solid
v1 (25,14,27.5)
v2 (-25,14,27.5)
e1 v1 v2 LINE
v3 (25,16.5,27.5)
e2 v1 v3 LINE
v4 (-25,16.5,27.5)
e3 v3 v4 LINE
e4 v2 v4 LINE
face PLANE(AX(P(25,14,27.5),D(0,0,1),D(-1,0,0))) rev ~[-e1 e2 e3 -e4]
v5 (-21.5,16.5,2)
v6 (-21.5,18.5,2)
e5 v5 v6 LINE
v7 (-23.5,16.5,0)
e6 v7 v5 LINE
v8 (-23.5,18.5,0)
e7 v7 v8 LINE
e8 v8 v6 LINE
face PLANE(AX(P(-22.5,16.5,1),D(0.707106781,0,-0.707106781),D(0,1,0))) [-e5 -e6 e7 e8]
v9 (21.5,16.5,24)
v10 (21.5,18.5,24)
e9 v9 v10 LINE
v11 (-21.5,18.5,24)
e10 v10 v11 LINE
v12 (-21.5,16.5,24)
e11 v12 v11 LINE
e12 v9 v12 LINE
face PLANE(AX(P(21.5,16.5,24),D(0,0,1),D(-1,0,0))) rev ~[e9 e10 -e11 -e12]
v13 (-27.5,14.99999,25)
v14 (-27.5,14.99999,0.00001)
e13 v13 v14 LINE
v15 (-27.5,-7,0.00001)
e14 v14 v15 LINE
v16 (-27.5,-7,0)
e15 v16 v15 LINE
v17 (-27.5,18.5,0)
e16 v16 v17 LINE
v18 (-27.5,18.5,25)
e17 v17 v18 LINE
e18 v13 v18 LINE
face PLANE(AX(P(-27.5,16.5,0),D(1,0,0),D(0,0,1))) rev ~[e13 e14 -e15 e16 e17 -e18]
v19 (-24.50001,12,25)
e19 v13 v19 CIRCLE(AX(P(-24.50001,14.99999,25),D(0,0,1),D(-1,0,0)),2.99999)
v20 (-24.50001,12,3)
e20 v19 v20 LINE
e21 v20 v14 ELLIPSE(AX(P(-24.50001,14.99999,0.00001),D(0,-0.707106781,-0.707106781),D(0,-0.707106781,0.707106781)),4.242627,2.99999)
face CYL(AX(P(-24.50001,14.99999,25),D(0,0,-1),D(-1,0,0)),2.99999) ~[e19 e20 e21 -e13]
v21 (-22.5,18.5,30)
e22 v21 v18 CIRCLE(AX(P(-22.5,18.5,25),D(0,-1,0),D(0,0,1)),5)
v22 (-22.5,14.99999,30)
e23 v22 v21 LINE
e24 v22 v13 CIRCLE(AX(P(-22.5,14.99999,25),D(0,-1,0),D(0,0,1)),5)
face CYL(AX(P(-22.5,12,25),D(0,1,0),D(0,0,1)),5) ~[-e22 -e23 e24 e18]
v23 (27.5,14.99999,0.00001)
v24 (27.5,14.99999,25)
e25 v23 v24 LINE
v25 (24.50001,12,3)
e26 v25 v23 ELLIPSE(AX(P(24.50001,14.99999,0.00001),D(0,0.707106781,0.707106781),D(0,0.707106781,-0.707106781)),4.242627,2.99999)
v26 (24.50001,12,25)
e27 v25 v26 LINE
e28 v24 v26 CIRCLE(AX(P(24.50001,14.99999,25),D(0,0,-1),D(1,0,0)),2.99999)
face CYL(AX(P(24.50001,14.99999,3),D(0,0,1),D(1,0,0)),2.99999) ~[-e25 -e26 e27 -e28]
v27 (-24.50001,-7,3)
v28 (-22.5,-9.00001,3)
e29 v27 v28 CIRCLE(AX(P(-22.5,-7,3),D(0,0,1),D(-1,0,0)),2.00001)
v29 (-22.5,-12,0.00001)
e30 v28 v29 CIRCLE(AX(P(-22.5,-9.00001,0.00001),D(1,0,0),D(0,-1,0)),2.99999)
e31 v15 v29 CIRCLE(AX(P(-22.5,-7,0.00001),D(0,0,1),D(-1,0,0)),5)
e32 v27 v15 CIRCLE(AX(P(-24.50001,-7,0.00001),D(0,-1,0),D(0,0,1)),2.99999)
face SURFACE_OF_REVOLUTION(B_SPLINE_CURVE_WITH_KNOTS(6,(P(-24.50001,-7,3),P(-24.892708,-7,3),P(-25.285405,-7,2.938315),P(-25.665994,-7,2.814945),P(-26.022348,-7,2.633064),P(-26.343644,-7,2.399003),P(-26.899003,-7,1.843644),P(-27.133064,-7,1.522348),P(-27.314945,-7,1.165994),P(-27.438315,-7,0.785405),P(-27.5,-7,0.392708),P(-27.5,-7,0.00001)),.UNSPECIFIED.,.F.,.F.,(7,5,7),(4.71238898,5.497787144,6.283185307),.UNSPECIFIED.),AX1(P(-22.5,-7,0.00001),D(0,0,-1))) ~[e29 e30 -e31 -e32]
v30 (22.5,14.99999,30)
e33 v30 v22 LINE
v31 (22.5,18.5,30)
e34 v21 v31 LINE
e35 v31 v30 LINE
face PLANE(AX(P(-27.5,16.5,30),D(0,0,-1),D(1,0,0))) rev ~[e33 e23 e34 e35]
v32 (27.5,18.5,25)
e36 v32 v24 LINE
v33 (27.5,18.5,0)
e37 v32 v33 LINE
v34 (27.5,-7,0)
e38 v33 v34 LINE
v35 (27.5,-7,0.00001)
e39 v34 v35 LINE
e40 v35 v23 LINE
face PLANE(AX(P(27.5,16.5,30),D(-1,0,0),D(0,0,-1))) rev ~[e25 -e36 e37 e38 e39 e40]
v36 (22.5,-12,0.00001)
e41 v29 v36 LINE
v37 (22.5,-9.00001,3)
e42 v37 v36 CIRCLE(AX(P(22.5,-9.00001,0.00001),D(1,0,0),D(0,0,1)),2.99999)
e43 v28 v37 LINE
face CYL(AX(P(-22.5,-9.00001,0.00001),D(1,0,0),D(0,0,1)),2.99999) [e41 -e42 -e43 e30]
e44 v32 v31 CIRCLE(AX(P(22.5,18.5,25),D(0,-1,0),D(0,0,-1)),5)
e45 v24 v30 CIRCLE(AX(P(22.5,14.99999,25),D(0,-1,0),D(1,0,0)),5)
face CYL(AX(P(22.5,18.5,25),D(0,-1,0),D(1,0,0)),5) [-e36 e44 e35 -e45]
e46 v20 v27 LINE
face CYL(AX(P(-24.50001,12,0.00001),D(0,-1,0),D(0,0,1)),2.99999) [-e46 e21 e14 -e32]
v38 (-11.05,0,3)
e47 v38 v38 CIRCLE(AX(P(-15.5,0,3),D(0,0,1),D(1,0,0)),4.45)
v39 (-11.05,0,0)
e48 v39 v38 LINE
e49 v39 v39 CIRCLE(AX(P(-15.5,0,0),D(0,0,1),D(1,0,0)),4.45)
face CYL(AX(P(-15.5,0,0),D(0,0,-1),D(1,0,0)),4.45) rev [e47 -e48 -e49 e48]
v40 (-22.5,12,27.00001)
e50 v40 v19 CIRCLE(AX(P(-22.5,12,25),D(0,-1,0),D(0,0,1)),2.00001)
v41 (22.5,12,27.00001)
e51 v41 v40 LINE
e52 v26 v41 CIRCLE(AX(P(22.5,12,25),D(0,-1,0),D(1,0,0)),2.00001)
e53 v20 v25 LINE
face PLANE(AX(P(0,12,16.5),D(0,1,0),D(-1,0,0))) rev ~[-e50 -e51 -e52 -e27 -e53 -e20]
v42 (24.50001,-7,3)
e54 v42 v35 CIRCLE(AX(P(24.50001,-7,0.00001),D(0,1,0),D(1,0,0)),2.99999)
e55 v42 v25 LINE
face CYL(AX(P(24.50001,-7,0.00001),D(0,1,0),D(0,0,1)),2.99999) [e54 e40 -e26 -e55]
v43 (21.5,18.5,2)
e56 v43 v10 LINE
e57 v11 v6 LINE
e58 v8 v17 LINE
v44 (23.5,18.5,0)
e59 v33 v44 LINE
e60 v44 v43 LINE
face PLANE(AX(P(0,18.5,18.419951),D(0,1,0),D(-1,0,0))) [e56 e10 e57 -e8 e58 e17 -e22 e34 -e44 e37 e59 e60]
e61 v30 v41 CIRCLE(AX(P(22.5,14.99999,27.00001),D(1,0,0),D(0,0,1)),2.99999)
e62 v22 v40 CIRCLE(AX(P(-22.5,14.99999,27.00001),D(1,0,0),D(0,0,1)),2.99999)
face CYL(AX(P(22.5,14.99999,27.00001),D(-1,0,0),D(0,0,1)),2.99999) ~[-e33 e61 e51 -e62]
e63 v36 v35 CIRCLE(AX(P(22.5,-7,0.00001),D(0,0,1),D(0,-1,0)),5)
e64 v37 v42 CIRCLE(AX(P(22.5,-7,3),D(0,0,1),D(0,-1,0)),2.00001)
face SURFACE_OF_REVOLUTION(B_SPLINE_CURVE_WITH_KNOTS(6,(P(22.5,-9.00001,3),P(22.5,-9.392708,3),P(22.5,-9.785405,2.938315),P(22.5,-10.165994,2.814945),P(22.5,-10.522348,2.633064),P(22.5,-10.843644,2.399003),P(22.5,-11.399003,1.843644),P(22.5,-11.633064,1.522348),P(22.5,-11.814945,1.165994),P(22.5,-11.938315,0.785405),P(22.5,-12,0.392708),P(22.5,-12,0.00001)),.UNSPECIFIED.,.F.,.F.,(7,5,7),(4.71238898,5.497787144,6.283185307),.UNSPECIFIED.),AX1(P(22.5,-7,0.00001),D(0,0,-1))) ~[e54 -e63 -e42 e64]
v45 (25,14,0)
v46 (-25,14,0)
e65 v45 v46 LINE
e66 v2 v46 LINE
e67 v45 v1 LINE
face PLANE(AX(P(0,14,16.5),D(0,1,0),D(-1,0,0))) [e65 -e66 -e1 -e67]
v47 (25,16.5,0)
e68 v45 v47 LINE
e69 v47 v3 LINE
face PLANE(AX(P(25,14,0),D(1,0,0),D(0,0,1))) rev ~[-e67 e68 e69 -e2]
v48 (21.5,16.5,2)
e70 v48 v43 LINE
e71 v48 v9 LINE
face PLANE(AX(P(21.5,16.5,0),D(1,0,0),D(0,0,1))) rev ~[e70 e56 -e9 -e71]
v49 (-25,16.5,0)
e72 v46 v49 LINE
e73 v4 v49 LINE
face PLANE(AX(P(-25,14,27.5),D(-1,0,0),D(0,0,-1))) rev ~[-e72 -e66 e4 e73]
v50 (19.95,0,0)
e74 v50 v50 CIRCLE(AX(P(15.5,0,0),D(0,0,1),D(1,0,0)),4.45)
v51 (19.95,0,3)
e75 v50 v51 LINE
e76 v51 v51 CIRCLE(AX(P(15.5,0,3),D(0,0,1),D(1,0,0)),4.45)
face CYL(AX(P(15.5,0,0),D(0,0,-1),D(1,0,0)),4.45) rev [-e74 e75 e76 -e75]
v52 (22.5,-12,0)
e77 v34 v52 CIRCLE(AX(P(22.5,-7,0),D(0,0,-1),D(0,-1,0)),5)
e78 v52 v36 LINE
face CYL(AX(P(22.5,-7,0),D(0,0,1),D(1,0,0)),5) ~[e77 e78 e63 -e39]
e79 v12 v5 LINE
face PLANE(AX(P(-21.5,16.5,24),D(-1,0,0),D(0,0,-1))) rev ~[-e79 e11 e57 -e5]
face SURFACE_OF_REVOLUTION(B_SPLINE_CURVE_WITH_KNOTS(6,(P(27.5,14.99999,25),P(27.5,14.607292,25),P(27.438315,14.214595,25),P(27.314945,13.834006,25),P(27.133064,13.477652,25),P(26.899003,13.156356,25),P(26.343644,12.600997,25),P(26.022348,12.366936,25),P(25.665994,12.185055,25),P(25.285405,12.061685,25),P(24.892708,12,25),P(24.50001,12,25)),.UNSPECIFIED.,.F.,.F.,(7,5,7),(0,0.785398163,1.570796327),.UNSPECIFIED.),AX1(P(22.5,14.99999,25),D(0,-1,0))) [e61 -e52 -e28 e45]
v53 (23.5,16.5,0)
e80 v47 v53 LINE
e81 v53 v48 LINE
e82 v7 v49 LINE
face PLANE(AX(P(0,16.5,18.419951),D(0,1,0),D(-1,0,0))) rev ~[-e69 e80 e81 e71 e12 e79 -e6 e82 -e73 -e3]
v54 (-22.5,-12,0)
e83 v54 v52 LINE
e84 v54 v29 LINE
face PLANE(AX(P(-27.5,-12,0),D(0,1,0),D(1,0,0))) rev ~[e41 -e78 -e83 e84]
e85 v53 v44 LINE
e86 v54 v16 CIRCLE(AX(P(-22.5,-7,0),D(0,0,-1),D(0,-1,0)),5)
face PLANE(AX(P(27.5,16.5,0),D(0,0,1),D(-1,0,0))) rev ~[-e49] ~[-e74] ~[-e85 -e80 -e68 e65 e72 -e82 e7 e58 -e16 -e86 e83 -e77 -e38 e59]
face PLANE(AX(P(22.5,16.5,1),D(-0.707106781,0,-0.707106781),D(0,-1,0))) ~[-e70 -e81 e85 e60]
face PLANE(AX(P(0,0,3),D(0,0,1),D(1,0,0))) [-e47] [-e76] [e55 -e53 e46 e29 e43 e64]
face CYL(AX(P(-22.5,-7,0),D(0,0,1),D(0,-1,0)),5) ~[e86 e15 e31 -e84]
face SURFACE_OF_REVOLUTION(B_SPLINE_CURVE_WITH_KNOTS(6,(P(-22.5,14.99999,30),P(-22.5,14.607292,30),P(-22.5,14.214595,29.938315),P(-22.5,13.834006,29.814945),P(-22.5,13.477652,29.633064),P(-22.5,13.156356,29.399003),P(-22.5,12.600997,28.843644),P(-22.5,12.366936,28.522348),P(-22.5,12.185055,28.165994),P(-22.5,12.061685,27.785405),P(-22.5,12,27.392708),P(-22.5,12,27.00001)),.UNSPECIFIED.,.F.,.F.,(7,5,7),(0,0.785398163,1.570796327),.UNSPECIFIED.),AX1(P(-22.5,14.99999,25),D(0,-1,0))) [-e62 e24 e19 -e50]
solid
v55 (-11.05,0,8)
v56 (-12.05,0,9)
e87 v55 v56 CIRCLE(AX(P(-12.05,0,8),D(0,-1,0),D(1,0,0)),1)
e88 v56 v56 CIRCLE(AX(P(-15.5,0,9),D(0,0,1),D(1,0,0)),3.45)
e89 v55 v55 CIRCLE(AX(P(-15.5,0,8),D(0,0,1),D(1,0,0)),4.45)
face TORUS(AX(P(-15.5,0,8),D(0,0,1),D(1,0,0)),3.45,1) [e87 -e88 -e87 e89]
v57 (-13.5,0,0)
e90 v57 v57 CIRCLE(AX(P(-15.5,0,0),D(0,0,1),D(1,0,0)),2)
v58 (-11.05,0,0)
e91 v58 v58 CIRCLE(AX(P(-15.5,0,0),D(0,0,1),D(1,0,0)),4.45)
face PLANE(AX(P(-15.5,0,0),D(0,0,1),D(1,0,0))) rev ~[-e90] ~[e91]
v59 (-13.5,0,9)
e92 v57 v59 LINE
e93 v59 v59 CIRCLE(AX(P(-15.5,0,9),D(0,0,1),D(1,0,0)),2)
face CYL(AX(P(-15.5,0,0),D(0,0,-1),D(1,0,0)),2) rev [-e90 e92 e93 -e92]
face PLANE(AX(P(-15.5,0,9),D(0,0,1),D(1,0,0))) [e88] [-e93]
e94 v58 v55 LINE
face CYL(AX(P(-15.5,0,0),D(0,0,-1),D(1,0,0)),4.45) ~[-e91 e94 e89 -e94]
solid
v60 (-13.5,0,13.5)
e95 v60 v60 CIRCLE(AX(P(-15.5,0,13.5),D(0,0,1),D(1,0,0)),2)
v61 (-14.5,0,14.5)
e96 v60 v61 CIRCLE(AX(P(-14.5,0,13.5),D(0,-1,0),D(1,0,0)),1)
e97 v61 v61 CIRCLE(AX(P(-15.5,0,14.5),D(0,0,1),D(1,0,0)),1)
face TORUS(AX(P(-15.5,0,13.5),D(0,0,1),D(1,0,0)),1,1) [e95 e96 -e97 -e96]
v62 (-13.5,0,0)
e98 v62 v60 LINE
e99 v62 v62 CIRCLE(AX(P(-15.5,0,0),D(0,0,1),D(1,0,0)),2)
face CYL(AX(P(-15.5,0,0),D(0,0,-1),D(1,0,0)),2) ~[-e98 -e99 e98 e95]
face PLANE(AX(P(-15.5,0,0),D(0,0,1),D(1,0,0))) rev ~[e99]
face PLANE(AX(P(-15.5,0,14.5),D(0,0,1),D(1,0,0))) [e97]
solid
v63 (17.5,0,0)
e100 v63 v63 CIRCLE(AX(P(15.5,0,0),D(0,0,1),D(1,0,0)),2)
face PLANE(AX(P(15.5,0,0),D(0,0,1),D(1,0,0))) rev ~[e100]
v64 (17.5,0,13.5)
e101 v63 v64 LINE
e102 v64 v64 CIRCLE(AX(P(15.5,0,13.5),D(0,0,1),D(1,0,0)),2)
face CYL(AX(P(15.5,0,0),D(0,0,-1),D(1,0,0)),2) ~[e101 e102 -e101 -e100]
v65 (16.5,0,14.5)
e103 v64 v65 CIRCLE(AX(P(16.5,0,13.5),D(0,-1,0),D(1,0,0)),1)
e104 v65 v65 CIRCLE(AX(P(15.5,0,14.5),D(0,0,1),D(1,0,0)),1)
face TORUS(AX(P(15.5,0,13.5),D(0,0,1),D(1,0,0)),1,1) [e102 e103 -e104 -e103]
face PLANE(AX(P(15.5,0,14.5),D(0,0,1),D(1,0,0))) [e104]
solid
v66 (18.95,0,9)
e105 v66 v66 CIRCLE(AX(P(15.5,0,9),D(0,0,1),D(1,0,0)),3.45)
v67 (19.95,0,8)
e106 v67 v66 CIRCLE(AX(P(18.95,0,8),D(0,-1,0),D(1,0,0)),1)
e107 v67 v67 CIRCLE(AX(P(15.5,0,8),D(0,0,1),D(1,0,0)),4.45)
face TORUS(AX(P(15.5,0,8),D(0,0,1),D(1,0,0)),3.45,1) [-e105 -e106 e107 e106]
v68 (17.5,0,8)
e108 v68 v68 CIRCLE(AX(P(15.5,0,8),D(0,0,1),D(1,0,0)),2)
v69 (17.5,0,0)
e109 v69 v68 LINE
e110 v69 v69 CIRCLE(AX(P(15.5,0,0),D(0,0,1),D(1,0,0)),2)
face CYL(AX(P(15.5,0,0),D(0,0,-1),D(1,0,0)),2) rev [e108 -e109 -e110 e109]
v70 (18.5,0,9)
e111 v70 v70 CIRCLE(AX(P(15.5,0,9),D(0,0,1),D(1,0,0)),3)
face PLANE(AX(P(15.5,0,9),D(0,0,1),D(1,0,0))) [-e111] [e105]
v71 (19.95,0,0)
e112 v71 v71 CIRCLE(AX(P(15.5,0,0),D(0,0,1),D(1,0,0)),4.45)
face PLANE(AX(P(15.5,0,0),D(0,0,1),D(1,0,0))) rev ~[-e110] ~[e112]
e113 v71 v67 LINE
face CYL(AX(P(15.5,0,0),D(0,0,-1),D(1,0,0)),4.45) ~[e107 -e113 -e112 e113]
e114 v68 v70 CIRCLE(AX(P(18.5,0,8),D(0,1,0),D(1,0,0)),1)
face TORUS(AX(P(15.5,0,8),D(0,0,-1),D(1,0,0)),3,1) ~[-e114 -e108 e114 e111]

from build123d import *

# Parameters (mm, degrees)
F0_R     = 2
F1_DEPTH = 14.5
F0_R_2   = 4.45
F2_DEPTH = 9
F0_W     = 55
F0_H     = 24
F3_DEPTH = 3
F4_W     = 55
F4_H     = 27
F4_H_2   = 3
F5_DEPTH = 2
F7_DEPTH = 2.5
F9_DEPTH = 2
F10_R    = 5
F11_R    = 2.99999
F12_R    = 1
F12_2_R  = 1
F12_3_R  = 1
F12_4_R  = 1
F13_SIZE = 2


# Not quite as in the source:
# - a fillet or chamfer is up to 0.001 mm smaller than in the source, because OpenCascade refuses the exact size


with BuildPart() as f1:
    # F0 (on Top) → F1 (new body)
    with BuildSketch(Plane.XY):
        with Locations((-15.5, 0)):
            Circle(F0_R)
    extrude(amount=F1_DEPTH)

    # F12
    f12_edges = [f1.edges().sort_by_distance(p)[0] for p in [
        (-17.5, 0, 14.5),
    ]]
    fillet(f12_edges, radius=F12_R)


with BuildPart() as f1b:
    # F0 (on Top) → F1, piece 2 (new body)
    with BuildSketch(Plane.XY):
        with Locations((15.5, 0)):
            Circle(F0_R)
    extrude(amount=F1_DEPTH)

    # F12#3
    f12_3_edges = [f1b.edges().sort_by_distance(p)[0] for p in [
        (13.5, 0, 14.5),
    ]]
    fillet(f12_3_edges, radius=F12_3_R)


with BuildPart() as f2:
    # F0 (on Top) → F2 (new body)
    with BuildSketch(Plane.XY):
        with Locations((15.5, 0)):
            Circle(F0_R_2)
        with Locations((15.5, 0)):
            Circle(F0_R, mode=Mode.SUBTRACT)
    extrude(amount=F2_DEPTH)

    # F12#4
    f12_4_edges = [f2.edges().sort_by_distance(p)[0] for p in [
        (11.05, 0, 9),
        (13.5, 0, 9),
    ]]
    fillet(f12_4_edges, radius=F12_4_R)


with BuildPart() as f2b:
    # F0 (on Top) → F2, piece 2 (new body)
    with BuildSketch(Plane.XY):
        with Locations((-15.5, 0)):
            Circle(F0_R_2)
        with Locations((-15.5, 0)):
            Circle(F0_R, mode=Mode.SUBTRACT)
    extrude(amount=F2_DEPTH)

    # F12#2
    f12_2_edges = [f2b.edges().sort_by_distance(p)[0] for p in [
        (-19.95, 0, 9),
    ]]
    fillet(f12_2_edges, radius=F12_2_R)


with BuildPart() as f3:
    # F0 (on Top) → F3 (new body)
    with BuildSketch(Plane.XY):
        Rectangle(F0_W, F0_H)
        with Locations((-15.5, 0)):
            Circle(F0_R_2, mode=Mode.SUBTRACT)
        with Locations((15.5, 0)):
            Circle(F0_R_2, mode=Mode.SUBTRACT)
    extrude(amount=F3_DEPTH)

    # F4 (on face) → F5 (join)
    with BuildSketch(Plane(origin=(0, 12, 0), x_dir=(-1, 0, 0), z_dir=(0, 1, 0))):
        with Locations((0, 16.5)):
            Rectangle(F4_W, F4_H)
        with Locations((0, 1.5)):
            Rectangle(F4_W, F4_H_2)
    extrude(amount=F5_DEPTH)

    # F6 (on face) → F7 (join)
    with BuildSketch(Plane(origin=(0, 14, 0), x_dir=(-1, 0, 0), z_dir=(0, 1, 0))):
        Polygon((-27.5, 30), (-27.5, 0), (-25, 0), (-25, 27.5), (25, 27.5), (25, 0), (27.5, 0), (27.5, 30), align=None)
    extrude(amount=F7_DEPTH)

    # F8 (on face) → F9 (join)
    with BuildSketch(Plane(origin=(0, 16.5, 0), x_dir=(-1, 0, 0), z_dir=(0, 1, 0))):
        Polygon((-25, 27.5), (-25, 0), (-21.5, 0), (-21.5, 24), (21.5, 24), (21.5, 0), (25, 0), (25, 27.5), align=None)
        Polygon((-27.5, 30), (-27.5, 0), (-25, 0), (-25, 27.5), (25, 27.5), (25, 0), (27.5, 0), (27.5, 30), align=None)
    extrude(amount=F9_DEPTH)

    # F10
    f10_edges = [f3.edges().sort_by_distance(p)[0] for p in [
        (27.5, 15.25, 30),
        (-27.5, 15.25, 30),
        (-27.5, -12, 1.5),
        (27.5, -12, 1.5),
    ]]
    fillet(f10_edges, radius=F10_R)

    # F11 (radius 3 in the source; OpenCascade refuses exactly that, so slightly less here)
    f11_edges = [f3.edges().sort_by_distance(p)[0] for p in [
        (0, -12, 3),
        (0, 12, 30),
    ]]
    fillet(f11_edges, radius=F11_R)

    # F13
    f13_edges = [f3.edges().sort_by_distance(p)[0] for p in [
        (-21.5, 17.5, 0),
        (21.5, 17.5, 0),
    ]]
    chamfer(f13_edges, length=F13_SIZE)


solid = Compound([f1.part, f1b.part, f2.part, f2b.part, f3.part])
